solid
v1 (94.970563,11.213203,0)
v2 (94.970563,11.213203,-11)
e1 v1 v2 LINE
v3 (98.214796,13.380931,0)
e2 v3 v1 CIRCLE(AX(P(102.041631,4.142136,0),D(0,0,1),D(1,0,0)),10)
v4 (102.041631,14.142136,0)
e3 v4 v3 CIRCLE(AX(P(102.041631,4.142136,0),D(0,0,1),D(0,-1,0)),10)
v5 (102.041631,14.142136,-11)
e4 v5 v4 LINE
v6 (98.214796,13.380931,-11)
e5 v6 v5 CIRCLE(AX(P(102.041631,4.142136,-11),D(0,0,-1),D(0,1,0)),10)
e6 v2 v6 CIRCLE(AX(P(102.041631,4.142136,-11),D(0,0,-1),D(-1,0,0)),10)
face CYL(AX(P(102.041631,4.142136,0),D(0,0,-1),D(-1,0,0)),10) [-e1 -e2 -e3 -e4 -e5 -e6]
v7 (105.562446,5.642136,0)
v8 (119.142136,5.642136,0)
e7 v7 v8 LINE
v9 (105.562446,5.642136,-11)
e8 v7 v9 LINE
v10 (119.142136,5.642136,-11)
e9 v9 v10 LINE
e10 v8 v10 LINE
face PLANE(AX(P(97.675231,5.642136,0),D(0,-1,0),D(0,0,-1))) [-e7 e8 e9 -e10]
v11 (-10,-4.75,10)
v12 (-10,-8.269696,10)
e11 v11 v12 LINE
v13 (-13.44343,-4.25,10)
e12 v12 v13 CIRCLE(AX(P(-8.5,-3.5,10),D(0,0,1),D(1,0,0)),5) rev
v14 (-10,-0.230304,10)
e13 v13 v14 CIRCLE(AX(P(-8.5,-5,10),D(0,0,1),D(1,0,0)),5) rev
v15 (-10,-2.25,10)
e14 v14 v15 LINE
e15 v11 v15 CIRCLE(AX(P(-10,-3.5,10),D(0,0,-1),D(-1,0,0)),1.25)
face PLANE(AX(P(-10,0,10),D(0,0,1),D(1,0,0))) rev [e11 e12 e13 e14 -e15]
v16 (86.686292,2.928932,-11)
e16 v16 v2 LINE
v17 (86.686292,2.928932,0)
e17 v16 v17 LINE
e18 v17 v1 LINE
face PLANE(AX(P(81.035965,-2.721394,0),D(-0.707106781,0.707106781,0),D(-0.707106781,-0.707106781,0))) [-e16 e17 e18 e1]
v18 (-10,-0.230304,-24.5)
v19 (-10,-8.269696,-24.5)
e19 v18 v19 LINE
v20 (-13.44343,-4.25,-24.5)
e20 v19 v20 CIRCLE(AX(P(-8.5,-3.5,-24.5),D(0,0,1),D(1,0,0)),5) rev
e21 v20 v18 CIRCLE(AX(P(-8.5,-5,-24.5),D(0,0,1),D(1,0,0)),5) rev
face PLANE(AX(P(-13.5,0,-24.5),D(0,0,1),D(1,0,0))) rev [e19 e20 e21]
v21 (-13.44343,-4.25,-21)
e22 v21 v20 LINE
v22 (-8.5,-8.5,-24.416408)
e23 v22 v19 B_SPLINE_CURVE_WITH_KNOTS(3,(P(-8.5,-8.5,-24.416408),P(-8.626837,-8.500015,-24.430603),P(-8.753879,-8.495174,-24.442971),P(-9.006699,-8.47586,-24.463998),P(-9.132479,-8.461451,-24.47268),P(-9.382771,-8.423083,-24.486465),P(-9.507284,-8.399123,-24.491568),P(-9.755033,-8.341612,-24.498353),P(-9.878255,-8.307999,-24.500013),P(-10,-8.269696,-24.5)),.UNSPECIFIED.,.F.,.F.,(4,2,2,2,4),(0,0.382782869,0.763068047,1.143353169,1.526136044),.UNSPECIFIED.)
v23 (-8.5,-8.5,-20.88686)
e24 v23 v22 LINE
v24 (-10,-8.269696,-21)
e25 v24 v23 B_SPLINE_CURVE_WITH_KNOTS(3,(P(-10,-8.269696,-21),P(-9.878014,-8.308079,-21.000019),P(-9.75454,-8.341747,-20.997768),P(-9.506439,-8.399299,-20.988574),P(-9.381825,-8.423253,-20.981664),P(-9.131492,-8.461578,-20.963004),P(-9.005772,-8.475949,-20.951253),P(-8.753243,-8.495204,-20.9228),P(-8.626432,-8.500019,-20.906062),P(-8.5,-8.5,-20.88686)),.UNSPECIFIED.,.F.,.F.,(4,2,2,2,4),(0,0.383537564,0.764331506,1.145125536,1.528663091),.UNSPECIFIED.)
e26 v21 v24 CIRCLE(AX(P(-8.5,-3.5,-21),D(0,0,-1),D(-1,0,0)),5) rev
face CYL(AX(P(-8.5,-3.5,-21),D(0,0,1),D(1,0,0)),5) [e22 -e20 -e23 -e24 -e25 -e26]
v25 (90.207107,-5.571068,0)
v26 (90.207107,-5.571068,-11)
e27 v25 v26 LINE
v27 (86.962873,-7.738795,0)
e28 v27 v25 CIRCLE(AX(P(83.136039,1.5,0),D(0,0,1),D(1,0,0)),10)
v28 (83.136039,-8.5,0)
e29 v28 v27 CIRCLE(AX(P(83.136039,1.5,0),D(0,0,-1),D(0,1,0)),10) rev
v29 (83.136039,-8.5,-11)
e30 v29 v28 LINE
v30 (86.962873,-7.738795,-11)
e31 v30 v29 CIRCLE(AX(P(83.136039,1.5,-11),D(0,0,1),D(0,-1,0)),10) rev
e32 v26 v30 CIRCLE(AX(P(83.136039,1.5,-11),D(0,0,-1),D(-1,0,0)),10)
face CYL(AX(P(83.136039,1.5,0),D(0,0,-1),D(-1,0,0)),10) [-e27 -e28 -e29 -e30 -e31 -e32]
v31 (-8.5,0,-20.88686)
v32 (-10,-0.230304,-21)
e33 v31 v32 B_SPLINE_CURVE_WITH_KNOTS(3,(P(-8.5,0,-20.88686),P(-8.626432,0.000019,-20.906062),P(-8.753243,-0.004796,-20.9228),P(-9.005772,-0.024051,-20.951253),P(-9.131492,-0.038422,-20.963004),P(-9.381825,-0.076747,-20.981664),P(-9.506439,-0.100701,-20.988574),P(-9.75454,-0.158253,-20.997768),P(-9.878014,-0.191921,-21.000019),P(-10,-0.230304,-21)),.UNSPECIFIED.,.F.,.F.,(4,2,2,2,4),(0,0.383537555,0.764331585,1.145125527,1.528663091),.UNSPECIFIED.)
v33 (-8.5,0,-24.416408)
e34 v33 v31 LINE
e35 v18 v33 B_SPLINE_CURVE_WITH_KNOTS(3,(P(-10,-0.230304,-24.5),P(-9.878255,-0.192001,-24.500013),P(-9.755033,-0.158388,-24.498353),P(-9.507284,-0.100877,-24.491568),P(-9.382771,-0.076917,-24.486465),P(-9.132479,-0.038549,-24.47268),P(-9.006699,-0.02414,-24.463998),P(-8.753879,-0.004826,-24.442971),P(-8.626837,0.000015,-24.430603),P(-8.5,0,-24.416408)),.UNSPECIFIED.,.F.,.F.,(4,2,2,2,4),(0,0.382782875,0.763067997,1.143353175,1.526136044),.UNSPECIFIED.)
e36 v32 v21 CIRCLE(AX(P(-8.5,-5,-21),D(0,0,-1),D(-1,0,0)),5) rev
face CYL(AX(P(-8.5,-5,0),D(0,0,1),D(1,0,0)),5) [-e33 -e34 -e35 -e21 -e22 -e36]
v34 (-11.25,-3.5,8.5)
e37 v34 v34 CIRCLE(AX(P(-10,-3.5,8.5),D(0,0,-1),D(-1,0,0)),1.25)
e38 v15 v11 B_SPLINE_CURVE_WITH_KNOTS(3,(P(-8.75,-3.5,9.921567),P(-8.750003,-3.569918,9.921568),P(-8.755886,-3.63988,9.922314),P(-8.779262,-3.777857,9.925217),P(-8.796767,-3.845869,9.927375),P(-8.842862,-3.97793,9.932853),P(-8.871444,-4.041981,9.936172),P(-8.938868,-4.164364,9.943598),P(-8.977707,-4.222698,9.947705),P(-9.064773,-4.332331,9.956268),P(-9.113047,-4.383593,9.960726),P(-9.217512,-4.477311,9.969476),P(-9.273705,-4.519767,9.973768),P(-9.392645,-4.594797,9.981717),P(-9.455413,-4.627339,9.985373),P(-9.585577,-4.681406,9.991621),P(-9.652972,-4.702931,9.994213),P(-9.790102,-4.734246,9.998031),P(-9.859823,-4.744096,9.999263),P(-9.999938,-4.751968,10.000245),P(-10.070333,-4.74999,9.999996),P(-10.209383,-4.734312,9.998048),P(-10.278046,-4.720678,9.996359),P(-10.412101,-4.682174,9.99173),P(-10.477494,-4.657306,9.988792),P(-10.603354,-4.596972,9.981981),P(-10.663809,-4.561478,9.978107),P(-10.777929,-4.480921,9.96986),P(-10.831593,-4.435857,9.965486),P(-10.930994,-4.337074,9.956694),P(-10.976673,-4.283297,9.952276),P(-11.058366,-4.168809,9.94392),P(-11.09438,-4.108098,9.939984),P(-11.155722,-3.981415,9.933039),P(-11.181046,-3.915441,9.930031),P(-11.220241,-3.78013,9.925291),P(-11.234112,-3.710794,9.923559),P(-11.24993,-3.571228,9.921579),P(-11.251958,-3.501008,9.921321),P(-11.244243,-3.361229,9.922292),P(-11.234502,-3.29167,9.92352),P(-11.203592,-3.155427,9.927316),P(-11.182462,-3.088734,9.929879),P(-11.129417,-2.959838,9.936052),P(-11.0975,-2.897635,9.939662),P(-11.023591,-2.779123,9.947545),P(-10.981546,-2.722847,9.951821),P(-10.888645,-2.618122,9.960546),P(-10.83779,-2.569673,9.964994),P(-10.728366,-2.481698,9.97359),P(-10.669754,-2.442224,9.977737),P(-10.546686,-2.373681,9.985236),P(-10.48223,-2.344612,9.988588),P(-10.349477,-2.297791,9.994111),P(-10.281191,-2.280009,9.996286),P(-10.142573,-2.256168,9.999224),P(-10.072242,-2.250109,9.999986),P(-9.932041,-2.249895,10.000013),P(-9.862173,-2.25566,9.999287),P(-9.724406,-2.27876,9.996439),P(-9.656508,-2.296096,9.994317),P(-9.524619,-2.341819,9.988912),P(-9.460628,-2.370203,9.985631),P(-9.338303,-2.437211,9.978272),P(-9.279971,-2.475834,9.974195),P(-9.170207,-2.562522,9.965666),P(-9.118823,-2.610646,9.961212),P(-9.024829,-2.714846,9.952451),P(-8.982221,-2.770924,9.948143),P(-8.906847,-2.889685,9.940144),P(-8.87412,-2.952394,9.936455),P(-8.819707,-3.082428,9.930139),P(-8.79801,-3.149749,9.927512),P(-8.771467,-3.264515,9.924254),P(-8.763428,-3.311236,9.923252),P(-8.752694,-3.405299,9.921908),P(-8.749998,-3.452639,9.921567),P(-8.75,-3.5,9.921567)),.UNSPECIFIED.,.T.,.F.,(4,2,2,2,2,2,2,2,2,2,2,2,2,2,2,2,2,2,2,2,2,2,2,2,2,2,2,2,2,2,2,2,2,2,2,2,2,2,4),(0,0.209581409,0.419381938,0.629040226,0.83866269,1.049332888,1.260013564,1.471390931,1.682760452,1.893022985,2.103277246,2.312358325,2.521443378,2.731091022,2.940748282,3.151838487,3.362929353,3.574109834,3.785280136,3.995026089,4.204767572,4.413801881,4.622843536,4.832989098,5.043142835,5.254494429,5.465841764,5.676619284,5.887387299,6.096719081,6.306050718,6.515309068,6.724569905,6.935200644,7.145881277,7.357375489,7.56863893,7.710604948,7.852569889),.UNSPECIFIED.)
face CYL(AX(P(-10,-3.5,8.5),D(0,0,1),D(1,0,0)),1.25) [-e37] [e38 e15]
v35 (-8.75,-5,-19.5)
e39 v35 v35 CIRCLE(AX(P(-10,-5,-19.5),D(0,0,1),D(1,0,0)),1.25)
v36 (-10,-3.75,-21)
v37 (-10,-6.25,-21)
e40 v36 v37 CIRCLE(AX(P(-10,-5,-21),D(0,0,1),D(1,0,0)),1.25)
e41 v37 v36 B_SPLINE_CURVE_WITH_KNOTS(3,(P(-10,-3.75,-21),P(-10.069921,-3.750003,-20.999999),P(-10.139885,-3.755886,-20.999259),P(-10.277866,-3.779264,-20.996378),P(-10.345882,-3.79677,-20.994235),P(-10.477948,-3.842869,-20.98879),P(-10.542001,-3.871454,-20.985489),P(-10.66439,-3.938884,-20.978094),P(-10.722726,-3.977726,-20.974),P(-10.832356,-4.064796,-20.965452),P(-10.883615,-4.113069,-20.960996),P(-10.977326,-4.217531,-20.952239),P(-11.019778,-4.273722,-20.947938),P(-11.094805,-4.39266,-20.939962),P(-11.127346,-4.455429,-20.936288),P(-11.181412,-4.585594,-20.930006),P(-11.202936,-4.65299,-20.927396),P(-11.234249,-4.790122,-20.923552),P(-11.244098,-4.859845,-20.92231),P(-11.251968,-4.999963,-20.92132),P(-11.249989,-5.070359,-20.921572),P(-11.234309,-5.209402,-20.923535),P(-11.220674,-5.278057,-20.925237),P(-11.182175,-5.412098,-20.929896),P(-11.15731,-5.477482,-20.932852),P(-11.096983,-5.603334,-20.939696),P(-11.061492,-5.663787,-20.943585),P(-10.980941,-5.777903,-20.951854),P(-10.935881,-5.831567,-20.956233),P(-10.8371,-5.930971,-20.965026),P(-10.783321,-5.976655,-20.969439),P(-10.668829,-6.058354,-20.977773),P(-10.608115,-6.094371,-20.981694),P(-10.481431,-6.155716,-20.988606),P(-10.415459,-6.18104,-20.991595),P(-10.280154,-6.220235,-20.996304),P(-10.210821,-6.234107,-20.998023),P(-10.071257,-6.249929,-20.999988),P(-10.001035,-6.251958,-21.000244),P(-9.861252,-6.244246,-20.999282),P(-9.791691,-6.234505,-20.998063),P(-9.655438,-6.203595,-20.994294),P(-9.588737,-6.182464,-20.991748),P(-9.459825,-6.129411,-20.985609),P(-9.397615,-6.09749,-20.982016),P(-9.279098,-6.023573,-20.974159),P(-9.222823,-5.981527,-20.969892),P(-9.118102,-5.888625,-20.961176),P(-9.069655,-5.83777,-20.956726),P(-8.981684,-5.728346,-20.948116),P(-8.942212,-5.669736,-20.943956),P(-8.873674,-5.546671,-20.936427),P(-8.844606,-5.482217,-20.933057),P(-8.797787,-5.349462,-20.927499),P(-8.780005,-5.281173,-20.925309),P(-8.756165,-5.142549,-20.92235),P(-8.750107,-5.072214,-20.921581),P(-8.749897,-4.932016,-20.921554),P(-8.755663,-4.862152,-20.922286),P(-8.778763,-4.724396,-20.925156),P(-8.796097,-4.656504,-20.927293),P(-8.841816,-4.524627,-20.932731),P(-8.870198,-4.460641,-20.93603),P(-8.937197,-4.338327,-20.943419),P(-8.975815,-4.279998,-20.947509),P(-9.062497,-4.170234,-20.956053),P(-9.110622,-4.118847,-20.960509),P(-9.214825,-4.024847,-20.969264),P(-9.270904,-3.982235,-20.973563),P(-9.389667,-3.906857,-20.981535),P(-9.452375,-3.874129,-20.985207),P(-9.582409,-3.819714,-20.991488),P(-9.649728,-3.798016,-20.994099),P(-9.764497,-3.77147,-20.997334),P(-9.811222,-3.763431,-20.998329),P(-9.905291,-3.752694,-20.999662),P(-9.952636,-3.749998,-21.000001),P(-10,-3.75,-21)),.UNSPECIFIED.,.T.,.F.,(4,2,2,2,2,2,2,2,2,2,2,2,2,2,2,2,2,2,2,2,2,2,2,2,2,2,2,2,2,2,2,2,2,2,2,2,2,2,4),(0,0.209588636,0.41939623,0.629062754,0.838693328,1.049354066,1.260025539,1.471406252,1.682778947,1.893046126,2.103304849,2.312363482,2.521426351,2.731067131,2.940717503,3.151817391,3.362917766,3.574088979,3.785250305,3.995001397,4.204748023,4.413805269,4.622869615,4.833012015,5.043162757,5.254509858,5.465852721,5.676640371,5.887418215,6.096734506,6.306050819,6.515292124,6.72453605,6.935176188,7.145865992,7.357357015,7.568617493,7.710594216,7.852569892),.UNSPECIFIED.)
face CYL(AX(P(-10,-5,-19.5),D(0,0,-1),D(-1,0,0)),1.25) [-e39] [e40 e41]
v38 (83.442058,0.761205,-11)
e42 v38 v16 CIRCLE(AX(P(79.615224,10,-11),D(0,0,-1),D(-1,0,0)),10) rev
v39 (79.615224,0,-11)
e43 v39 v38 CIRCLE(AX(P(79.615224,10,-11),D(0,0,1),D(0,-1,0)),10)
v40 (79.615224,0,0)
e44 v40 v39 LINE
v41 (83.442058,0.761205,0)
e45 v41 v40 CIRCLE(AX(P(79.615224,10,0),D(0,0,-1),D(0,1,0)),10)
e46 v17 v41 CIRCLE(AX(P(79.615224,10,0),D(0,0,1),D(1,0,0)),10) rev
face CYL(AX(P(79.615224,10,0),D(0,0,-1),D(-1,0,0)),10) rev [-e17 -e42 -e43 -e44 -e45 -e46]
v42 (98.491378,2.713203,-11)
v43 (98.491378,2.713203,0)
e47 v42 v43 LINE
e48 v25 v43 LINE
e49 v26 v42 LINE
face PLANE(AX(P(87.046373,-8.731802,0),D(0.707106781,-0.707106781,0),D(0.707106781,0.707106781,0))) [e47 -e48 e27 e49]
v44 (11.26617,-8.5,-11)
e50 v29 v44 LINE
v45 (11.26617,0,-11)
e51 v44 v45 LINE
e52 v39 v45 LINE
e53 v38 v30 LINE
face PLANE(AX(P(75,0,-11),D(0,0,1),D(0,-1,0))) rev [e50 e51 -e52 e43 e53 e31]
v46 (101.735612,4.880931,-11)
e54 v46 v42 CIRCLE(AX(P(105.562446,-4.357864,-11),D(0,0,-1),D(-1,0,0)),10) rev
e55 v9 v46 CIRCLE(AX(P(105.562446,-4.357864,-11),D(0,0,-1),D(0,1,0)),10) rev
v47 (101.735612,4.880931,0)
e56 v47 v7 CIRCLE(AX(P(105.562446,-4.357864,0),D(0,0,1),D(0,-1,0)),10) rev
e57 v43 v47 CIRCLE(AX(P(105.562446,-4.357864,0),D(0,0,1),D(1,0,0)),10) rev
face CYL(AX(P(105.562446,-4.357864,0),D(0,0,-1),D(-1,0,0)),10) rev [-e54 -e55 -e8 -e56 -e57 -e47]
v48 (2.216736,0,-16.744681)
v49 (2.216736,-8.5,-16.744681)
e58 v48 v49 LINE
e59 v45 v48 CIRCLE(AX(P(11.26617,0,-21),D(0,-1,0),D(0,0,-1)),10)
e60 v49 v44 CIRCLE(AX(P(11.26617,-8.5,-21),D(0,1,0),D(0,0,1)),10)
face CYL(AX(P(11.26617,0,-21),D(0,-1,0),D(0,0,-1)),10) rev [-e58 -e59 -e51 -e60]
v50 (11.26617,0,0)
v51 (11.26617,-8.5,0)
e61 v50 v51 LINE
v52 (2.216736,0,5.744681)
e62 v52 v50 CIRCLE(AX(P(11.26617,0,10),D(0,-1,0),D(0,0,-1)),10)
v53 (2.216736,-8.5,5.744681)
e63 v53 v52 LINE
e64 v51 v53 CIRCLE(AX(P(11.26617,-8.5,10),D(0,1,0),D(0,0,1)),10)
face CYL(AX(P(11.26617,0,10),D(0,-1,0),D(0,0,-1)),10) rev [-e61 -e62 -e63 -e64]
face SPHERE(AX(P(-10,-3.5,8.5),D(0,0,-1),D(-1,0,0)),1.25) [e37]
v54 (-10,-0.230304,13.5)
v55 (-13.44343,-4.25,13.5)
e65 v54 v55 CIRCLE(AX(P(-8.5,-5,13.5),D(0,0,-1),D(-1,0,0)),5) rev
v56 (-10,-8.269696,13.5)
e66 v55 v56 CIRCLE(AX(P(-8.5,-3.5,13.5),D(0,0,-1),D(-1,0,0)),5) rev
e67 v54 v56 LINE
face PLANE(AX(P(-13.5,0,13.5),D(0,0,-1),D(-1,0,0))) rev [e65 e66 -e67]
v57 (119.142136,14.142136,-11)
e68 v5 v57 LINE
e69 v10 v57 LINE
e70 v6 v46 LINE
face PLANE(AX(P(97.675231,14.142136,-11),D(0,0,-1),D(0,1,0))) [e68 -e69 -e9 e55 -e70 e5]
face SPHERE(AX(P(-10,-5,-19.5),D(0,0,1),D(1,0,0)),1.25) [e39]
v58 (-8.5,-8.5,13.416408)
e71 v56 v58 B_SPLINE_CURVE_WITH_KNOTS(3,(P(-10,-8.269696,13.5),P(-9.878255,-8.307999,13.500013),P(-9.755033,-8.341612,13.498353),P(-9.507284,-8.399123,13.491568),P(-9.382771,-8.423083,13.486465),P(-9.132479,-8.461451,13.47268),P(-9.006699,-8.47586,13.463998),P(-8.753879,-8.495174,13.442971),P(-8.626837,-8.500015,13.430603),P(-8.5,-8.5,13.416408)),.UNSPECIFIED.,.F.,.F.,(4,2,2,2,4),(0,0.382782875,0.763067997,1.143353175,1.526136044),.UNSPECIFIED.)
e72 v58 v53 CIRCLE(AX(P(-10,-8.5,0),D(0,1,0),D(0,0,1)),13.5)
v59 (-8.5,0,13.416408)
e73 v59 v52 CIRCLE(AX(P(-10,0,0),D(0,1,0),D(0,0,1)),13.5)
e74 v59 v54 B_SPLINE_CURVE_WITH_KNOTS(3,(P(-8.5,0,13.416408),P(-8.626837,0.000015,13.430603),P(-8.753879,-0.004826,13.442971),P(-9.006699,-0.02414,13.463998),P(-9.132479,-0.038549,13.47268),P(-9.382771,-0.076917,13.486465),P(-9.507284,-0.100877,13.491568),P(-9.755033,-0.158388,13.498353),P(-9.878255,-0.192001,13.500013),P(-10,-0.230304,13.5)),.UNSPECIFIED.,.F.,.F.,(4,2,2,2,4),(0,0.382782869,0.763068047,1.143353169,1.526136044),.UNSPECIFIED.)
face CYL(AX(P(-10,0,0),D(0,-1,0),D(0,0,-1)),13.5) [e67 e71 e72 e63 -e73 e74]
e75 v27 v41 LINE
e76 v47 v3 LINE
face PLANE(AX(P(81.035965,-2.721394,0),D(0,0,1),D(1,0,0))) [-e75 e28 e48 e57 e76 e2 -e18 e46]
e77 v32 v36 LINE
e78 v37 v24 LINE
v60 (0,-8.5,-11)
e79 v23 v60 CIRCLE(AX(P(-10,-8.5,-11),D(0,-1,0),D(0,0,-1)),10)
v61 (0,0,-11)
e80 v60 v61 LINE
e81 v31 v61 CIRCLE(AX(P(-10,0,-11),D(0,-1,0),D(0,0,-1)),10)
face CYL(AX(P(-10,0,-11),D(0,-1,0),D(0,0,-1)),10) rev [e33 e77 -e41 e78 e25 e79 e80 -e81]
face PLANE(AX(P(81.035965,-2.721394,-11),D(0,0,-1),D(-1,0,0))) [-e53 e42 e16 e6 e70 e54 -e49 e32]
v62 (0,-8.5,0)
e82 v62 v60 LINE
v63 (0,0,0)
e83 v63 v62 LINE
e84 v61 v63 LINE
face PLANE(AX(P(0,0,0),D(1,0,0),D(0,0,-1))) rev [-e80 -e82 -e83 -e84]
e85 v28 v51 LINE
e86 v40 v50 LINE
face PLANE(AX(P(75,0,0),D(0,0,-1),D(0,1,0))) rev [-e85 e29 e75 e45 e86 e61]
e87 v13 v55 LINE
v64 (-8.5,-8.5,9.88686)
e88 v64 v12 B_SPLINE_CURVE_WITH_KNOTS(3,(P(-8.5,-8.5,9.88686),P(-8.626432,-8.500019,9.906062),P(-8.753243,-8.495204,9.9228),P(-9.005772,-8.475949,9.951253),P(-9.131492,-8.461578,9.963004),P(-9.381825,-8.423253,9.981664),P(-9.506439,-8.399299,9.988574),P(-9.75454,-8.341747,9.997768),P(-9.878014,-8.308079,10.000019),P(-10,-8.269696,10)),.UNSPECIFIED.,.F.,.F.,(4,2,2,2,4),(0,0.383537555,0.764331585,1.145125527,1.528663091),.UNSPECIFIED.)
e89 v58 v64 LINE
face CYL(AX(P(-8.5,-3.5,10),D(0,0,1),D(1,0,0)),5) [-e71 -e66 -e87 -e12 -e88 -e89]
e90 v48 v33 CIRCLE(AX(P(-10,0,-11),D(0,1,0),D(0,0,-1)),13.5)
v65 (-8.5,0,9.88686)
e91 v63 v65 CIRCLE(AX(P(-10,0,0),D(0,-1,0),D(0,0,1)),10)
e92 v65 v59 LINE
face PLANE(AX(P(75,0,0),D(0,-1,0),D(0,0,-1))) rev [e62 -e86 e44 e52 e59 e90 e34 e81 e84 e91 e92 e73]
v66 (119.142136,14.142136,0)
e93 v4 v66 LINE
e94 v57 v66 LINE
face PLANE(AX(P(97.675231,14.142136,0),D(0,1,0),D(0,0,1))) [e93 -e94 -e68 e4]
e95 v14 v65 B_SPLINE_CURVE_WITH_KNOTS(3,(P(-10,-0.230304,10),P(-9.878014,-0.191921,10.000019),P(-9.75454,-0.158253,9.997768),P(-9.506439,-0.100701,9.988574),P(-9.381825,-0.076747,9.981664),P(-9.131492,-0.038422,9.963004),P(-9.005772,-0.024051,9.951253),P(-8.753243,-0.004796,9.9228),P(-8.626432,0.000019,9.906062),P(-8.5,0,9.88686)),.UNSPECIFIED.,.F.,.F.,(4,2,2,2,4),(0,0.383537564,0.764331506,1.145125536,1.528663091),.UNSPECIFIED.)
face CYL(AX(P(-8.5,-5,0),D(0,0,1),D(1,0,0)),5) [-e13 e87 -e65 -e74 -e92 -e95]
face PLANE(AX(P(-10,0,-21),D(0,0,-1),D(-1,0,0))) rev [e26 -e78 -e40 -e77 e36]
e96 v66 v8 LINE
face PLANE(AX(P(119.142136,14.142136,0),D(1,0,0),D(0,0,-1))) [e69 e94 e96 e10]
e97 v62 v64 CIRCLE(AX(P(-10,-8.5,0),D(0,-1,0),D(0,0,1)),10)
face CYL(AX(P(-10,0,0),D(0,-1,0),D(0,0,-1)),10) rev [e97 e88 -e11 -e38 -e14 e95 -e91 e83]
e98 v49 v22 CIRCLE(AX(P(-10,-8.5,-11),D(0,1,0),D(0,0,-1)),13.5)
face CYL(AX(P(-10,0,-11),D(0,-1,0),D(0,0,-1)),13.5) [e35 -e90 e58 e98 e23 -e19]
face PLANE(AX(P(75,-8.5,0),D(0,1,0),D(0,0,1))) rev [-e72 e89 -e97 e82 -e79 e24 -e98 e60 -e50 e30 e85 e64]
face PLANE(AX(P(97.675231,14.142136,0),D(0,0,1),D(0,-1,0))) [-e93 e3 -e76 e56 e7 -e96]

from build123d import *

# Parameters (mm, degrees)
SKETCH1_W           = 11
SKETCH1_H           = 8.5
BOSS_EXTRUDE1_DEPTH = 75
SKETCH14_W          = 11
SKETCH14_H          = 8.5
FILLET1_R           = 10
BOSS_EXTRUDE3_START = -8.5
BOSS_EXTRUDE3_DEPTH = 8.5
FILLET5_R           = 10
FILLET6_R           = 5
SKETCH18_R          = 1.25
BOSS_EXTRUDE4_DEPTH = 1.5
SKETCH19_R          = 1.25
BOSS_EXTRUDE5_DEPTH = 1.5
REVOLVE9_ANGLE      = 180
REVOLVE10_ANGLE     = 180


with BuildPart() as part:
    # Sketch1 → Boss-Extrude1 (new body)
    with BuildSketch(Plane(origin=(0, 0, 0), x_dir=(0, 0, -1), z_dir=(1, 0, 0))):
        with Locations((5.5, -4.25)):
            Rectangle(SKETCH1_W, SKETCH1_H)
    extrude(amount=BOSS_EXTRUDE1_DEPTH)

    # Sweep3: sweep along a curve in space
    with BuildLine() as sweep3_path:
        Line((75, -3, -5.5), (85, -3, -5.5))
        Line((85, -3, -5.5), (99.142135624, 11.142135624, -5.5))
        Line((99.142135624, 11.142135624, -5.5), (119.142135624, 11.142135624, -5.5))
    # Sketch14 → Sweep3 (sweep)
    with BuildSketch(Plane(origin=(75, 0, 0), x_dir=(0, 0, -1), z_dir=(1, 0, 0))):
        with Locations((5.5, -4.25)):
            Rectangle(SKETCH14_W, SKETCH14_H)
    sweep(path=sweep3_path.line, transition=Transition.RIGHT)

    # Fillet1
    fillet1_edges = [part.edges().sort_by_distance(p)[0] for p in [
        (97.899494937, 14.142135624, -5.5),
        (101.420310217, 5.642135624, -5.5),
        (83.757359313, 0, -5.5),
        (87.278174593, -8.5, -5.5),
    ]]
    fillet(fillet1_edges, radius=FILLET1_R)

    # Sketch17 → Boss-Extrude3 (add)
    with BuildSketch(Plane(origin=(0, 0, 0), x_dir=(1, 0, 0), z_dir=(0, 1, 0)).offset(BOSS_EXTRUDE3_START)):
        with BuildLine():
            Line((-10, -10), (-13.5, -10))
            Line((-13.5, -10), (-13.5, -13.5))
            Line((-13.5, -13.5), (-10, -13.5))
            ThreePointArc((-10, -13.5), (-0.454058454, -9.545941546), (3.5, 0))
            Line((3.5, 0), (3.5, 11))
            ThreePointArc((3.5, 11), (-0.454058454, 20.545941546), (-10, 24.5))
            Line((-10, 24.5), (-13.5, 24.5))
            Line((-13.5, 24.5), (-13.5, 21))
            Line((-13.5, 21), (-10, 21))
            ThreePointArc((-10, 21), (-2.928932188, 18.071067812), (0, 11))
            Line((0, 11), (0, 0))
            ThreePointArc((0, 0), (-2.928932188, -7.071067812), (-10, -10))
        make_face()
    extrude(amount=BOSS_EXTRUDE3_DEPTH)

    # Fillet5
    fillet5_edges = [part.edges().sort_by_distance(p)[0] for p in [
        (3.5, -4.25, 0),
        (3.5, -4.25, -11),
    ]]
    fillet(fillet5_edges, radius=FILLET5_R)

    # Fillet6
    # the kernel refuses this fillet: 5 mm, written as the material it takes off along each edge
    with BuildSketch(Plane(origin=(-13.5, -8.5, -2.5), x_dir=(0, 1, 0), z_dir=(0, 0, 1)), Plane(origin=(-13.5, 0, -2.5), x_dir=(1, 0, 0), z_dir=(0, 0, 1)), Plane(origin=(-13.5, -8.5, -37), x_dir=(0, 1, 0), z_dir=(0, 0, 1)), Plane(origin=(-13.5, 0, -37), x_dir=(1, 0, 0), z_dir=(0, 0, 1))) as fillet6_piece_1:
        with BuildLine():
            CenterArc((FILLET6_R, -FILLET6_R), FILLET6_R, 90, 90)
            Line((0, -FILLET6_R), (0, 0))
            Line((0, 0), (FILLET6_R, 0))
        make_face()
    extrude(amount=28.5, mode=Mode.SUBTRACT)

    # Sketch18 → Boss-Extrude4 (add)
    with BuildSketch(Plane.XY.offset(-21)):
        with Locations(Location((-10, -5, 0), (0, 0, 270))):
            Circle(SKETCH18_R)
    extrude(amount=BOSS_EXTRUDE4_DEPTH)

    # Sketch19 → Boss-Extrude5 (add)
    with BuildSketch(Plane(origin=(0, 0, 10), x_dir=(-1, 0, 0), z_dir=(0, 0, -1))):
        with Locations(Location((10, -3.5, 0), (0, 0, 269.999999996))):
            Circle(SKETCH19_R)
    extrude(amount=BOSS_EXTRUDE5_DEPTH)

    # Sketch24 → Revolve9 (revolve)
    with BuildSketch(Plane(origin=(0, 0, 8.5), x_dir=(-1, 0, 0), z_dir=(0, 0, -1))):
        with BuildLine():
            Line((10, -2.25), (10, -4.75))
            ThreePointArc((10, -4.75), (11.25, -3.5), (10, -2.25))
        make_face()
    revolve(axis=Axis((-10, -2.25, 8.5), (0, -1, 0)), revolution_arc=REVOLVE9_ANGLE)

    # Sketch25 → Revolve10 (revolve)
    with BuildSketch(Plane.XY.offset(-19.5)):
        with BuildLine():
            Line((-10, -3.75), (-10, -6.25))
            ThreePointArc((-10, -6.25), (-11.25, -5), (-10, -3.75))
        make_face()
    revolve(axis=Axis((-10, -3.75, -19.5), (0, 1, 0)), revolution_arc=REVOLVE10_ANGLE)


solid = part.part
